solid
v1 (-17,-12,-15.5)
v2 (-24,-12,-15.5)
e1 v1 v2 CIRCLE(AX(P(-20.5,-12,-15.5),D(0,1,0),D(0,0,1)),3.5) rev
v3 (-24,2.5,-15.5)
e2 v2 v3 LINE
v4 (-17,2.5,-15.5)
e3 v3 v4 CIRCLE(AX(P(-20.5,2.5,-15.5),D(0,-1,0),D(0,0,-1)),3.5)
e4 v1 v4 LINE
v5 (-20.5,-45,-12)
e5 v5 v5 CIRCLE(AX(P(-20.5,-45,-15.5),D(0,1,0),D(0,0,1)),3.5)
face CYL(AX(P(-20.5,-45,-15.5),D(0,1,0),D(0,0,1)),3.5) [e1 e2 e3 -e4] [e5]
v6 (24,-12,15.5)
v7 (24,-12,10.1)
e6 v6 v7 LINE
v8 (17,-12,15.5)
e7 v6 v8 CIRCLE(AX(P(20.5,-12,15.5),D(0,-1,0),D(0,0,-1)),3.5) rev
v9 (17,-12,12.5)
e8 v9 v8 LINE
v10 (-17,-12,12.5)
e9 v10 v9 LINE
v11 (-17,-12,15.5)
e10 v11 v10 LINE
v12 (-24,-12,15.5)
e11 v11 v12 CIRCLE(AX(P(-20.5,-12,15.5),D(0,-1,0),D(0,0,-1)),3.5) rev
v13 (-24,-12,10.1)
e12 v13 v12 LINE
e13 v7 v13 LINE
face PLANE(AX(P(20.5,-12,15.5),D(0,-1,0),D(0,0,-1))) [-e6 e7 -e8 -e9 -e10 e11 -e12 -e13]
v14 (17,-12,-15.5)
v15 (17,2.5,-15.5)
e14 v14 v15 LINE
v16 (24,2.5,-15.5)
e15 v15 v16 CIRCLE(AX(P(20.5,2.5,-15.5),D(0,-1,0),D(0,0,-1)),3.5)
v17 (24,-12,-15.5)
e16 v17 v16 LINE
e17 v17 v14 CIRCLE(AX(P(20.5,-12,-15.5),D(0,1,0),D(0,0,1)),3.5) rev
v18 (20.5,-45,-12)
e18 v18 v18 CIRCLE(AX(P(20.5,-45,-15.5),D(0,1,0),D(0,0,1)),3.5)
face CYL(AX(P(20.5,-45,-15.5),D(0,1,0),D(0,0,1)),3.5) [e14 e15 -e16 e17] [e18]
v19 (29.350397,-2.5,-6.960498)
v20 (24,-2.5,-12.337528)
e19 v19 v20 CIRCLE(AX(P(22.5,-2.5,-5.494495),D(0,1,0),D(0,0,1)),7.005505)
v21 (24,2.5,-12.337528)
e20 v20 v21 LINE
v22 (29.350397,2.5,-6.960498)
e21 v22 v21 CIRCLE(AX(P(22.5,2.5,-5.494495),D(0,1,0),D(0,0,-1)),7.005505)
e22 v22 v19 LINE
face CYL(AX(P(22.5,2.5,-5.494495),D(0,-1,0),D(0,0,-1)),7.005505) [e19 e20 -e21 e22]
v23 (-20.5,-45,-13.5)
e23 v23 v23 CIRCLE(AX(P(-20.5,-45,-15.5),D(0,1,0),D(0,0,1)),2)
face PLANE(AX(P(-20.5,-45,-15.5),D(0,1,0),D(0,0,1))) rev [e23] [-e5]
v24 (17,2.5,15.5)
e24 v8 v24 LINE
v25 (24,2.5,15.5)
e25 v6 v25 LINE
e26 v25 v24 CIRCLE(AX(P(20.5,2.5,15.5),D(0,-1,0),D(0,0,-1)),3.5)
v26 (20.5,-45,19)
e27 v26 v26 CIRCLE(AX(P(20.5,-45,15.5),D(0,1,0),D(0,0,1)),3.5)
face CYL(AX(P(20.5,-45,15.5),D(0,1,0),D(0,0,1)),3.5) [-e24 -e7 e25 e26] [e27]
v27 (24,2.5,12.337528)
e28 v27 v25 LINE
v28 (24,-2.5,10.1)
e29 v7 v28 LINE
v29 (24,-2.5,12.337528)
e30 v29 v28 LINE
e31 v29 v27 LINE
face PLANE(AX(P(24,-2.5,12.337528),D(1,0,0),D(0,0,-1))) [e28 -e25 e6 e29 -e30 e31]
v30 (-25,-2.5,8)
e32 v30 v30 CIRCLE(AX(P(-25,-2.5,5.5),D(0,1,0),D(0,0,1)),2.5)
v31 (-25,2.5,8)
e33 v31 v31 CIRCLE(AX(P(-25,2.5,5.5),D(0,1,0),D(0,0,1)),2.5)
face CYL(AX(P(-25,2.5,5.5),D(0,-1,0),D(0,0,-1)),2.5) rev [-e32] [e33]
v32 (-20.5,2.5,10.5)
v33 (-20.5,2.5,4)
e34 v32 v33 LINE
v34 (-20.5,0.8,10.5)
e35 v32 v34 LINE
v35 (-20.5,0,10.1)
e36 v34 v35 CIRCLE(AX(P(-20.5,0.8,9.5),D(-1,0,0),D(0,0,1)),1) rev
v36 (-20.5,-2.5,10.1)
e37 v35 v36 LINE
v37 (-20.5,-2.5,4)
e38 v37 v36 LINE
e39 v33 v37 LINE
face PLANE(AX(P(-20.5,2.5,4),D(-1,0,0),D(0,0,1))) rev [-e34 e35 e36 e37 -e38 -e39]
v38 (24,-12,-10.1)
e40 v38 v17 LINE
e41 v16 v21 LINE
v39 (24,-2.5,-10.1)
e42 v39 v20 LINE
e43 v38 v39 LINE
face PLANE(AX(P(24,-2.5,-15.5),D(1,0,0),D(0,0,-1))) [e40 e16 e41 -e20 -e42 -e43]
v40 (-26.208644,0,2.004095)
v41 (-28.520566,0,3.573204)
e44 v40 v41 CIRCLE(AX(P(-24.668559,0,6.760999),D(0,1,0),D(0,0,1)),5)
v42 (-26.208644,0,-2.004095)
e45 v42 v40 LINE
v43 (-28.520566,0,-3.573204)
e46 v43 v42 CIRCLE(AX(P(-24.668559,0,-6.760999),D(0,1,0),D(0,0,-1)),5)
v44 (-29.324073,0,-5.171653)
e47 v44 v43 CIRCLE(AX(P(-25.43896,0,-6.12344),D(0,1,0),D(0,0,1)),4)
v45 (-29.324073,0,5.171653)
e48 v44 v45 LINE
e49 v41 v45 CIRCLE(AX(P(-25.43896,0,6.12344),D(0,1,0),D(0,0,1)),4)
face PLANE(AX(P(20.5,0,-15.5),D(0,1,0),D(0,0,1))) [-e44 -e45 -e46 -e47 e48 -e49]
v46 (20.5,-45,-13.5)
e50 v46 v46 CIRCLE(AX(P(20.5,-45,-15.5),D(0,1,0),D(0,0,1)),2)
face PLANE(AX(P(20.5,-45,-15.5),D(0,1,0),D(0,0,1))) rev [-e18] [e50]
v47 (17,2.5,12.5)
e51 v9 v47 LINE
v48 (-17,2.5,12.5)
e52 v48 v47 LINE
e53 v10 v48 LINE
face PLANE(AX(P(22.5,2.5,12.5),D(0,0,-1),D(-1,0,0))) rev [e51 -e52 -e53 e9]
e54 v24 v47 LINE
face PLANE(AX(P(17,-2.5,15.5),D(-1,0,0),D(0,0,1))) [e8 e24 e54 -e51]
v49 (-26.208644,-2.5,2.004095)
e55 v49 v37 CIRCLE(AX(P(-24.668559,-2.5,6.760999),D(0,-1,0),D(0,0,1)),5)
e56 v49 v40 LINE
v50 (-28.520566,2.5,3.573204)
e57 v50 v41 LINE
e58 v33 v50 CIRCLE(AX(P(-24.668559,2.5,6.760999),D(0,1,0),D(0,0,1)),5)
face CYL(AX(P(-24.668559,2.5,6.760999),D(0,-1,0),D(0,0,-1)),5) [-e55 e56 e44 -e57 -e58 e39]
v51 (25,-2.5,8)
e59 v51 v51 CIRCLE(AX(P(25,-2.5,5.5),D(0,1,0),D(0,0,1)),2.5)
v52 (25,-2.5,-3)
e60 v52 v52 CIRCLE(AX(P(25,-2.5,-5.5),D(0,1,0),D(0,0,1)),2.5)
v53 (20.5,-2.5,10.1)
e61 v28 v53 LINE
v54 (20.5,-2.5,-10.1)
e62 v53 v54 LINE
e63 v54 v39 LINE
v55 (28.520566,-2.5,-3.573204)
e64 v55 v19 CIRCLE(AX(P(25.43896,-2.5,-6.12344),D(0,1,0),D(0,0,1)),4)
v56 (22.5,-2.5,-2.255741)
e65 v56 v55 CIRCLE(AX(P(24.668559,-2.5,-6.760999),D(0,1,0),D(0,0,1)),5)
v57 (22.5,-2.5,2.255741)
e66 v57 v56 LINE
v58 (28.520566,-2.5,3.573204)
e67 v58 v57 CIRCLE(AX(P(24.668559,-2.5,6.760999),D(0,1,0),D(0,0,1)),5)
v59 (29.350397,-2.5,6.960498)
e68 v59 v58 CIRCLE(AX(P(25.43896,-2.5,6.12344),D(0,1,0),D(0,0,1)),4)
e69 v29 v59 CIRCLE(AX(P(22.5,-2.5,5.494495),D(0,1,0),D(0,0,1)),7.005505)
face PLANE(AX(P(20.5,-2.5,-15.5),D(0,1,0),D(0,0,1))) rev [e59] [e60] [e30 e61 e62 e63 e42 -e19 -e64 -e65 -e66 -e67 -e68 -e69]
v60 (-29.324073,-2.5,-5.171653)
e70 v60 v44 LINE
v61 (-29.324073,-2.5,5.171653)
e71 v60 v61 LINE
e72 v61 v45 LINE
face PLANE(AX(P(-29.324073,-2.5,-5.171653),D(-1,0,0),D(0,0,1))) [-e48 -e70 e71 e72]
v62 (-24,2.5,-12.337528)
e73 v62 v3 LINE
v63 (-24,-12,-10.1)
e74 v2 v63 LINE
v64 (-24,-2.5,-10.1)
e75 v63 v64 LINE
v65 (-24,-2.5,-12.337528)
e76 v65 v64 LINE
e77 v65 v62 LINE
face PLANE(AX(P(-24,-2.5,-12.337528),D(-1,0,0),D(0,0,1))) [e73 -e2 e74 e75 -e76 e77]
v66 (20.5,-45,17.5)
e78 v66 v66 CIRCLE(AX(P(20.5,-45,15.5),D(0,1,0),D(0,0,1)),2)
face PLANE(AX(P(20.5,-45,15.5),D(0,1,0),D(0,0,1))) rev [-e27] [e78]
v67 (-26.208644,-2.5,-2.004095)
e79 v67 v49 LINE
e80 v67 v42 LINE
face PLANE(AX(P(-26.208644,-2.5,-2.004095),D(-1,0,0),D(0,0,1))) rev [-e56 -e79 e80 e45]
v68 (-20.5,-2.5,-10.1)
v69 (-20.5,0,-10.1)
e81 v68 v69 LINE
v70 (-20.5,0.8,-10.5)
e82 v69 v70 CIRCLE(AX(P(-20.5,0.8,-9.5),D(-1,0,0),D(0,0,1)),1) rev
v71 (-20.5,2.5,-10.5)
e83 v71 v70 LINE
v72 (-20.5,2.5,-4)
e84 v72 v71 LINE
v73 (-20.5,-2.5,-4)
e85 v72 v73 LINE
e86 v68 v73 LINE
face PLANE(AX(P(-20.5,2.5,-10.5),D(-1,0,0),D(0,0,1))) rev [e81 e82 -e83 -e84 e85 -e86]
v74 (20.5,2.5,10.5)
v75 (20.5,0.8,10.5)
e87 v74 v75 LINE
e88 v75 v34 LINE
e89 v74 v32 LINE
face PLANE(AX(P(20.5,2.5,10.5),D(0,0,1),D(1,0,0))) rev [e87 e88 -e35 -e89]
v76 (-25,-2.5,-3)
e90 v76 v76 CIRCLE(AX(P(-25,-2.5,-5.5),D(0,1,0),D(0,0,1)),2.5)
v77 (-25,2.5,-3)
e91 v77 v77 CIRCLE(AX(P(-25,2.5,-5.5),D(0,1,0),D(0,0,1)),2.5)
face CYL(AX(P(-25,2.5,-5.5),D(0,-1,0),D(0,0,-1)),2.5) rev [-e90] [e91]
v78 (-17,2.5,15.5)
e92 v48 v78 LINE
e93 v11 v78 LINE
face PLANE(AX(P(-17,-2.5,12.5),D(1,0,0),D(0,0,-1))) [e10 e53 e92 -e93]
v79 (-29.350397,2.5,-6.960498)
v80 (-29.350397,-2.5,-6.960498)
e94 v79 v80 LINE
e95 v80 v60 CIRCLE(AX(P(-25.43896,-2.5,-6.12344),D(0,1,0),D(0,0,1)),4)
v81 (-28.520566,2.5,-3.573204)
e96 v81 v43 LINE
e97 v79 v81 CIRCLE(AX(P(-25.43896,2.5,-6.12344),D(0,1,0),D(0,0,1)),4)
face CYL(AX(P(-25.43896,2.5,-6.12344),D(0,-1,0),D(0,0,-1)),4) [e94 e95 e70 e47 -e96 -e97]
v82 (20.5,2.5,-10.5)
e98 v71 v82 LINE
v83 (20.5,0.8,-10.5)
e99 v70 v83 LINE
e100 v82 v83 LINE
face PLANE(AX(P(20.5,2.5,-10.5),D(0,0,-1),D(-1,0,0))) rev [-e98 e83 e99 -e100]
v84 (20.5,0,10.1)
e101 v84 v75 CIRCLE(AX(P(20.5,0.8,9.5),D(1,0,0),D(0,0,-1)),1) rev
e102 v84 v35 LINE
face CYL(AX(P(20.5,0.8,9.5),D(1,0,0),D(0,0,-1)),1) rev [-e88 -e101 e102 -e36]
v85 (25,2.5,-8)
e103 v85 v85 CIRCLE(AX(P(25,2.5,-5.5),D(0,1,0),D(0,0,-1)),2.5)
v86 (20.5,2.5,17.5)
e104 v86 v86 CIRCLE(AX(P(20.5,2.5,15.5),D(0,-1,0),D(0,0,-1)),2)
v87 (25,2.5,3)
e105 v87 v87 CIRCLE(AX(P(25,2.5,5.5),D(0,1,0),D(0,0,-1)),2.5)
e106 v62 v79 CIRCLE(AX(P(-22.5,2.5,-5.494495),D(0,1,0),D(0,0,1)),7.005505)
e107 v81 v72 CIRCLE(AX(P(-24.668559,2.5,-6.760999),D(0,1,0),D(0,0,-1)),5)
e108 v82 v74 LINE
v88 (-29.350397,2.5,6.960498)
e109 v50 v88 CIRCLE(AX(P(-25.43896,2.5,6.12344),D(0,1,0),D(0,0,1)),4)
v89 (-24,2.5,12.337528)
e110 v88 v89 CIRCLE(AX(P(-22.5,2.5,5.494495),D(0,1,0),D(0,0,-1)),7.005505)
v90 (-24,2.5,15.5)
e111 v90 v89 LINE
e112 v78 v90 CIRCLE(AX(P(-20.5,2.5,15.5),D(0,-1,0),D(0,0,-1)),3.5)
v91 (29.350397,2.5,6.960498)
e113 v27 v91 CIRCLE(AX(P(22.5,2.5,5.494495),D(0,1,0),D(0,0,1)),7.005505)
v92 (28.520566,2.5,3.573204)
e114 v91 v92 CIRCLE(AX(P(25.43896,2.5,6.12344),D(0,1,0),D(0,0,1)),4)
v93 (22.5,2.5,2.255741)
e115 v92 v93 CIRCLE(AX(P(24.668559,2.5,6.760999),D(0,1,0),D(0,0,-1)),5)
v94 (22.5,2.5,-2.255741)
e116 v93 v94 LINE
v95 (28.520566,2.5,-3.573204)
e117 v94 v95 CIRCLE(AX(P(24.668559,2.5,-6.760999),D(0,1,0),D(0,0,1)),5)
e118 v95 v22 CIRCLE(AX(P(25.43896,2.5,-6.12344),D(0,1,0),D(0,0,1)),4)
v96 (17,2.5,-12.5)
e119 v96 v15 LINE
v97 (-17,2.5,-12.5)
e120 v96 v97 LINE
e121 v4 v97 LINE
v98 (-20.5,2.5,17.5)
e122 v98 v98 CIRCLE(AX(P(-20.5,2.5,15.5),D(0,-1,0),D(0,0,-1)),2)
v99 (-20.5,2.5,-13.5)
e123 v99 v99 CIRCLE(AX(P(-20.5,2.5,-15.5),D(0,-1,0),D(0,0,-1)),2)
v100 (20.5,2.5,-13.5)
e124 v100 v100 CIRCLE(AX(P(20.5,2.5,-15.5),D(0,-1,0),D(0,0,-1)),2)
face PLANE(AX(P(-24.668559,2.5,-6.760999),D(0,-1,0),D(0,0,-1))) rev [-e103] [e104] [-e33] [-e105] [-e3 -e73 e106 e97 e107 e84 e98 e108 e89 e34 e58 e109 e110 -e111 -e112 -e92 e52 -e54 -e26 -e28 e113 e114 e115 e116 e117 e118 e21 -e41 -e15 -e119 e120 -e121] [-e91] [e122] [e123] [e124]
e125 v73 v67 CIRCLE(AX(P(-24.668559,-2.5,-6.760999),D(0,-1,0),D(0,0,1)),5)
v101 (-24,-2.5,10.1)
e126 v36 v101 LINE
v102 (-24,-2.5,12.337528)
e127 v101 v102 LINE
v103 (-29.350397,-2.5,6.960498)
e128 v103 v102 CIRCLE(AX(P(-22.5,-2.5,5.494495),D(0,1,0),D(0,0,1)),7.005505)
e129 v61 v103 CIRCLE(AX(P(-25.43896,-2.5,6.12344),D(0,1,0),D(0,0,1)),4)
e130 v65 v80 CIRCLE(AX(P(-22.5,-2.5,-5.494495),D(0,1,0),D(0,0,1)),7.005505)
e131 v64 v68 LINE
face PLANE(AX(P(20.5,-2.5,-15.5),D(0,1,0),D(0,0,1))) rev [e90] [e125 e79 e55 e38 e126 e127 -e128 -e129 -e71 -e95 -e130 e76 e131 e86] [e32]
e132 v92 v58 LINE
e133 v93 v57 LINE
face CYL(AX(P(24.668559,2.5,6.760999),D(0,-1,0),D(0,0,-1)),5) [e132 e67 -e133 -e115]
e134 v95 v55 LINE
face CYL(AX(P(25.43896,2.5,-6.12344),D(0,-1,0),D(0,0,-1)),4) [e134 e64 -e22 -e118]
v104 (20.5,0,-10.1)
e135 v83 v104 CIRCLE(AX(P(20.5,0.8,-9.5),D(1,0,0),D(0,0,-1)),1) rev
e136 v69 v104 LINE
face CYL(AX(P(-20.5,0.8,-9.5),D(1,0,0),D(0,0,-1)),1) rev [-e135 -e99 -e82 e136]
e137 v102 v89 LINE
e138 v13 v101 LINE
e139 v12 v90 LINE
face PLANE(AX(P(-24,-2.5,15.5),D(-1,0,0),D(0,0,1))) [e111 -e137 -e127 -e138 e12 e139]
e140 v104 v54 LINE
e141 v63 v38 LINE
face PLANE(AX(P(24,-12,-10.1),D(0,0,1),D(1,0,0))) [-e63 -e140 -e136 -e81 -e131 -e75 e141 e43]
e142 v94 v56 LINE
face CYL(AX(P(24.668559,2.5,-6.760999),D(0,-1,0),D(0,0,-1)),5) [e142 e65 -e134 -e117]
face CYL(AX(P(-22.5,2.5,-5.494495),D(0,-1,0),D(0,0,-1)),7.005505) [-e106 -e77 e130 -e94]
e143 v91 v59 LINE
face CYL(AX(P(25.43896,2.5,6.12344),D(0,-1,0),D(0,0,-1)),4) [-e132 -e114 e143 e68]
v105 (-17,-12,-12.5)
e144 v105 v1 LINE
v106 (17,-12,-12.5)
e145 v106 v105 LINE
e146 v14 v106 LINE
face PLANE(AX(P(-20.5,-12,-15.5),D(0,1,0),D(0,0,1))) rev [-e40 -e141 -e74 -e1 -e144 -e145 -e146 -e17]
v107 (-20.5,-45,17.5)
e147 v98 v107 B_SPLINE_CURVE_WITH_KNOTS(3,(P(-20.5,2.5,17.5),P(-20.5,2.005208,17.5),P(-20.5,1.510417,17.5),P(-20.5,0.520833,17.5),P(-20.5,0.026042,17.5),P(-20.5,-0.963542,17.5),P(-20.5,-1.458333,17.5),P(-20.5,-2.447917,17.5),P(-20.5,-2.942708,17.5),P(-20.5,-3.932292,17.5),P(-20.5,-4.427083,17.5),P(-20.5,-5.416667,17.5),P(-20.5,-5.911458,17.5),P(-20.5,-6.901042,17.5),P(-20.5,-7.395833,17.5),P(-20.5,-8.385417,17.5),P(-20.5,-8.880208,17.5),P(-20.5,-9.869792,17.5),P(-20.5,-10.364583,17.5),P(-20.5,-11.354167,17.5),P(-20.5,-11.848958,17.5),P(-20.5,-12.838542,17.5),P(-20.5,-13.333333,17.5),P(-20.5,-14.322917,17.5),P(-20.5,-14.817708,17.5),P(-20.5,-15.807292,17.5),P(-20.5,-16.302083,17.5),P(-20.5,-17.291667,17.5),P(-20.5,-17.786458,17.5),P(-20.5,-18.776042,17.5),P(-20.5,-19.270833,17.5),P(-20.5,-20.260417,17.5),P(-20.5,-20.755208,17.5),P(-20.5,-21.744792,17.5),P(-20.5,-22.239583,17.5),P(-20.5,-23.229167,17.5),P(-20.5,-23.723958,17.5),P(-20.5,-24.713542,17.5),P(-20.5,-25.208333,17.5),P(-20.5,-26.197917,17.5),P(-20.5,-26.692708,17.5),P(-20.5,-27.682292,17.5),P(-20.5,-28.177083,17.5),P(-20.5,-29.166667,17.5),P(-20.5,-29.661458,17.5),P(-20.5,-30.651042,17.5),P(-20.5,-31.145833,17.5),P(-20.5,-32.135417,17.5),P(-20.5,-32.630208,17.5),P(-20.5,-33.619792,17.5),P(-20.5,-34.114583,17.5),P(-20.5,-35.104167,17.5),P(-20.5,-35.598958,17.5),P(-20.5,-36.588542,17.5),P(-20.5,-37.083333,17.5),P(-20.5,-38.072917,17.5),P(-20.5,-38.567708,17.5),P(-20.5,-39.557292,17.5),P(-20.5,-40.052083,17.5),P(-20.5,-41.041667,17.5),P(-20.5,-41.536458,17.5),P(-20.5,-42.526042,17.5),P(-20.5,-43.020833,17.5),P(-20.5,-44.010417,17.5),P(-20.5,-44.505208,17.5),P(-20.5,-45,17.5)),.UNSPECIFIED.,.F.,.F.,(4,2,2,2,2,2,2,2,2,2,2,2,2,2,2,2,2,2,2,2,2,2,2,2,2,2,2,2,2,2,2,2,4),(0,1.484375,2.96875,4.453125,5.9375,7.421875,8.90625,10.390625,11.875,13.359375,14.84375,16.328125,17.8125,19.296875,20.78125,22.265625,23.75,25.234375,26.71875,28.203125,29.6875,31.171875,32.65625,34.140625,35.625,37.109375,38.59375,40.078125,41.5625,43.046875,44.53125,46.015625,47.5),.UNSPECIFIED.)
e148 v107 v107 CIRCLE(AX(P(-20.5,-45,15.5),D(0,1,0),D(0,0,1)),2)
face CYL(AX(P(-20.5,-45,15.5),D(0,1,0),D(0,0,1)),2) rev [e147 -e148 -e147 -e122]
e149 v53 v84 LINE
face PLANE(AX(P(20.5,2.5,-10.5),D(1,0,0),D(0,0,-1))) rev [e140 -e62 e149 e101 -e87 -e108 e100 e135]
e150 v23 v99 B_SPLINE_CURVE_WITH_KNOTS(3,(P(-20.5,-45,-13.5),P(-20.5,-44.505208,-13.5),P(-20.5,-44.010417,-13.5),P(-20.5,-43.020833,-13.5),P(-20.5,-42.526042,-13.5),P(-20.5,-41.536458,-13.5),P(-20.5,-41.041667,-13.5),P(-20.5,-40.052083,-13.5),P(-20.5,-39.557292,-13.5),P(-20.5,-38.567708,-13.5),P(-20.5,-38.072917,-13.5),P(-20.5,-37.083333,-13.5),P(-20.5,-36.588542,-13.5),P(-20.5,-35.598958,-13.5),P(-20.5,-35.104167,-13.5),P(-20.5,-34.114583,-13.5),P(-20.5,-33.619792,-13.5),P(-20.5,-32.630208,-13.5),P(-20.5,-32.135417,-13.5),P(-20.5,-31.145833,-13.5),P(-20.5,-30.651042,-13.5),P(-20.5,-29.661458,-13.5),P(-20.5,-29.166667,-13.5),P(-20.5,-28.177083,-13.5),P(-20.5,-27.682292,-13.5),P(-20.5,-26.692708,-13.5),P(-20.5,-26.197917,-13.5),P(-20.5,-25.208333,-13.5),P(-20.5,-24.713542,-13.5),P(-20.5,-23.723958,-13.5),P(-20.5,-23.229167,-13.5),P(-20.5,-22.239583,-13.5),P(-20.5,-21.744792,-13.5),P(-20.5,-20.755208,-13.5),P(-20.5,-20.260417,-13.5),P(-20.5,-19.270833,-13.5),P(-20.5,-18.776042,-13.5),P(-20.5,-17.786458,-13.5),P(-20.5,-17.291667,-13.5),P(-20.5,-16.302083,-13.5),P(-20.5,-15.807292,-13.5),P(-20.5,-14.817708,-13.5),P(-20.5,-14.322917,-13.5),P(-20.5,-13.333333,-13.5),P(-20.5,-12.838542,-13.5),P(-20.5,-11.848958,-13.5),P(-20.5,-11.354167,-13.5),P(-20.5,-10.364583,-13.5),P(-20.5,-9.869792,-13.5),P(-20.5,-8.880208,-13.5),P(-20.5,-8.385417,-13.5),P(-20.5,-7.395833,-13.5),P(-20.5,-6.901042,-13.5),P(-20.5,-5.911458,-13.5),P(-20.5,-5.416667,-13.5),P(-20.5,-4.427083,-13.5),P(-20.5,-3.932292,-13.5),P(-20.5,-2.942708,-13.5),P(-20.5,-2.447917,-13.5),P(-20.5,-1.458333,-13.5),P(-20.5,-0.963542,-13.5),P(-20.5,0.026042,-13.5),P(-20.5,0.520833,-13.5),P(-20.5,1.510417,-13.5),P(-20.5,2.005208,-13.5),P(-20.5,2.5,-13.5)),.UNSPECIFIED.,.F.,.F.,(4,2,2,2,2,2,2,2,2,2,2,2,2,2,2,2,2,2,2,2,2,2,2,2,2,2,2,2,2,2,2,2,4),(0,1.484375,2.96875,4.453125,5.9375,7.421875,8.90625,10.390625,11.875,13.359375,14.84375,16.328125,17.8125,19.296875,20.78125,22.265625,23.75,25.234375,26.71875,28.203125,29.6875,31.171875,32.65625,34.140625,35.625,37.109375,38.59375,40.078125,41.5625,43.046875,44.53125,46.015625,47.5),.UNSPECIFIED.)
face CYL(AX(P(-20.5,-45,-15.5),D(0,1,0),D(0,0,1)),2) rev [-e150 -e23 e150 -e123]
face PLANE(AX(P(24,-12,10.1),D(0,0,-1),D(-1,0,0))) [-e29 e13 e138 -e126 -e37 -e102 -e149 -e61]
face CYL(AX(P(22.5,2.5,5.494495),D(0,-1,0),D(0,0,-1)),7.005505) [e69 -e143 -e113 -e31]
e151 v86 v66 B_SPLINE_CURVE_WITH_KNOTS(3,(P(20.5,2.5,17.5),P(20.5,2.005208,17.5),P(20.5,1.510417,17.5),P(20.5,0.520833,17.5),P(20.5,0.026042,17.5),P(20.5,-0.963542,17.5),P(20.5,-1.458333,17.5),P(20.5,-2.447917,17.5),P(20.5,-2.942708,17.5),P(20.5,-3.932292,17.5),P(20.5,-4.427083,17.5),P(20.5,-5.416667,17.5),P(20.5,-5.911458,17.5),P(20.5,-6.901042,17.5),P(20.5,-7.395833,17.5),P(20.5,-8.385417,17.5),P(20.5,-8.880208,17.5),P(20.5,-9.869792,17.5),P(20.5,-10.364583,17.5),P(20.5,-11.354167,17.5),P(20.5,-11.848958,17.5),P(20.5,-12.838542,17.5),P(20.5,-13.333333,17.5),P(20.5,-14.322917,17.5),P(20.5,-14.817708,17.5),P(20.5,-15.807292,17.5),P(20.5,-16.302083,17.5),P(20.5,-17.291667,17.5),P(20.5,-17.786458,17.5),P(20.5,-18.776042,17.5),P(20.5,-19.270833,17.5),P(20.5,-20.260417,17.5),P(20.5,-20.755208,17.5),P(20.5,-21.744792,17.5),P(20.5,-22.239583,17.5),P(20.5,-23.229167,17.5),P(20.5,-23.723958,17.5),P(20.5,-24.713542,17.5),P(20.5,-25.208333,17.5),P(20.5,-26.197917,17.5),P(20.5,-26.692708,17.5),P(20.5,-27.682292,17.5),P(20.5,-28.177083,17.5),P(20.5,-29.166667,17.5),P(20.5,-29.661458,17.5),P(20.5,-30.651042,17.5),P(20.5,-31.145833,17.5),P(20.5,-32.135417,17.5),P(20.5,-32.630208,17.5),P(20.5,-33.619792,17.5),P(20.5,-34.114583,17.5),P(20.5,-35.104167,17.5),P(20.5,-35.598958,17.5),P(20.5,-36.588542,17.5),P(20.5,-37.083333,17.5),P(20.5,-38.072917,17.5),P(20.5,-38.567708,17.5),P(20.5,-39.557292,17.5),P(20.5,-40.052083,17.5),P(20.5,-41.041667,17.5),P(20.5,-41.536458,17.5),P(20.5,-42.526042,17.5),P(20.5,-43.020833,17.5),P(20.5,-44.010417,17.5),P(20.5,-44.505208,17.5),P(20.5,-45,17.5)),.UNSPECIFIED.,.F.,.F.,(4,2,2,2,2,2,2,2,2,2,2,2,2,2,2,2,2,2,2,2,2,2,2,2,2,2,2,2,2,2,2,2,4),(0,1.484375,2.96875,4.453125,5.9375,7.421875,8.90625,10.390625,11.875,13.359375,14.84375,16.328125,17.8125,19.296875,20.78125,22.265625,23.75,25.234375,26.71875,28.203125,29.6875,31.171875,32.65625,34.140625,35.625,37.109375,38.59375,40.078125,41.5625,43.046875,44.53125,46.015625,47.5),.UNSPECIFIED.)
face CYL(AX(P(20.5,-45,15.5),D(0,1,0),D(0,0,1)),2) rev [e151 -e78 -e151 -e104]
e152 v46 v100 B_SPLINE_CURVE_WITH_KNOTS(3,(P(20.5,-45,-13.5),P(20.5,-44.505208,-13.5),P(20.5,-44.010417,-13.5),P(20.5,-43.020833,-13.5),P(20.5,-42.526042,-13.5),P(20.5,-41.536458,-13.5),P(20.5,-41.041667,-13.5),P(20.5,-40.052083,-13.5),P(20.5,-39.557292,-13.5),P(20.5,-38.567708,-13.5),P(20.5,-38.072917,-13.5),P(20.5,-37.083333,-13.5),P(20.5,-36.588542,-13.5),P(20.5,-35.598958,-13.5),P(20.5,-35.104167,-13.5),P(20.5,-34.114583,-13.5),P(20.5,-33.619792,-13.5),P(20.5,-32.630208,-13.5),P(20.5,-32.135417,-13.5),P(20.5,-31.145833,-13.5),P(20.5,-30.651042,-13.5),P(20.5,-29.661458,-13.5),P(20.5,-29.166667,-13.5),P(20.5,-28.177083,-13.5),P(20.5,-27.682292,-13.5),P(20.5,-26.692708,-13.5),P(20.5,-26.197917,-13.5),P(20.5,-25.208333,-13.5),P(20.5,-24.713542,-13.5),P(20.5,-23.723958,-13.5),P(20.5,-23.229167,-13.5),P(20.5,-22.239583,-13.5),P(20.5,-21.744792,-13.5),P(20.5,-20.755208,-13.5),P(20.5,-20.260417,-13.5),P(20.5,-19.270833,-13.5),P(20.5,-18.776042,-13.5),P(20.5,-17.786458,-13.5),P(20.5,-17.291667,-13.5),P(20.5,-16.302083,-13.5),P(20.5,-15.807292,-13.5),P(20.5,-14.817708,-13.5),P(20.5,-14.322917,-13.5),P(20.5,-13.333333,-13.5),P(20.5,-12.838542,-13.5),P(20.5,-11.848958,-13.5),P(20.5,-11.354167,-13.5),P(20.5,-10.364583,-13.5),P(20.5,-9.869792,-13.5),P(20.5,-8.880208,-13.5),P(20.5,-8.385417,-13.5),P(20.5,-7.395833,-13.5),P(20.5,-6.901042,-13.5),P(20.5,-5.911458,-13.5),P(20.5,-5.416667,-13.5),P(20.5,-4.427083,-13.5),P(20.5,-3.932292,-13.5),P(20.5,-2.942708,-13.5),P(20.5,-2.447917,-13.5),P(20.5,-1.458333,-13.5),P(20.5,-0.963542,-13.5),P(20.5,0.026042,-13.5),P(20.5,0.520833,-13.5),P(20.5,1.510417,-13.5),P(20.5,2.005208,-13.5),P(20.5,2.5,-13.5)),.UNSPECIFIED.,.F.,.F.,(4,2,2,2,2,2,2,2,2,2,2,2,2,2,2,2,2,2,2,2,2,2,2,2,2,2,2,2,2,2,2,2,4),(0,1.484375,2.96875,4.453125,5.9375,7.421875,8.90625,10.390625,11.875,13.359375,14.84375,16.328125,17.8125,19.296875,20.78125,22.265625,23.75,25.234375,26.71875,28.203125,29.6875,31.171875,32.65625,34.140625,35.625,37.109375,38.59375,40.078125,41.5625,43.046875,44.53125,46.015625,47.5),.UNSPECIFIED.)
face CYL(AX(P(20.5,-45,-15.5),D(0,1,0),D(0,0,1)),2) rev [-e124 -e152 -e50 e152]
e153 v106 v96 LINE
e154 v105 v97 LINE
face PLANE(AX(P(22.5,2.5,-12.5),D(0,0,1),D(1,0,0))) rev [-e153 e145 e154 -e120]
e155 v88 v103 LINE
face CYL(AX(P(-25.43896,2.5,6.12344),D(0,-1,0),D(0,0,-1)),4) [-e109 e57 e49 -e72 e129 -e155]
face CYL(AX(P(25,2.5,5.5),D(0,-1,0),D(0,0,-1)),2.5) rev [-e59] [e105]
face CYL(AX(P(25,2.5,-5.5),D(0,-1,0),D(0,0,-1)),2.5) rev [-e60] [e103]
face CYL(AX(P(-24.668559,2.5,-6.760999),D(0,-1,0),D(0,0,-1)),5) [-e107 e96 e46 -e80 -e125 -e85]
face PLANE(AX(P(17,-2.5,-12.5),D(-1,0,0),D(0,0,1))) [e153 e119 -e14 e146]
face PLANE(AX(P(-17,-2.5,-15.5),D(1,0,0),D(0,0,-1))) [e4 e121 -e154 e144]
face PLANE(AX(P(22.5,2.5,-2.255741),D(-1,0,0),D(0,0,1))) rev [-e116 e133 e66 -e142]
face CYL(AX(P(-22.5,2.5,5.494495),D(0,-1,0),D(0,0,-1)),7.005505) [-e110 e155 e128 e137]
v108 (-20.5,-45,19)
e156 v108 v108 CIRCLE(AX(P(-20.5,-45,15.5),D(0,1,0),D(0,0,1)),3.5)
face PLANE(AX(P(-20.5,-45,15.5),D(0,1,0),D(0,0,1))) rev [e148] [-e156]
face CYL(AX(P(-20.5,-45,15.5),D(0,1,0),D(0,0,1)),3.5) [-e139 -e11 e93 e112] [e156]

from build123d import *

# Parameters (mm, degrees)
SKETCH1_R           = 2.5
BOSS_EXTRUDE1_DEPTH = 2.5
BOSS_EXTRUDE2_START = -45
SKETCH4_R           = 3.5
SKETCH4_R_2         = 2
BOSS_EXTRUDE2_DEPTH = 47.5
BOSS_EXTRUDE3_START = -2.5
SKETCH5_R           = 2.5
BOSS_EXTRUDE3_DEPTH = 2.5
BOSS_EXTRUDE4_START = -12
BOSS_EXTRUDE4_DEPTH = 12
BOSS_EXTRUDE5_DEPTH = 2.5
FILLET2_R           = 1
FILLET3_R           = 1


with BuildPart() as part:
    # Sketch1 → Boss-Extrude1 (new body)
    with BuildSketch(Plane(origin=(0, 0, 0), x_dir=(1, 0, 0), z_dir=(0, 1, 0))):
        with BuildLine():
            Line((20.5, 10.5), (-20.5, 10.5))
            Line((-20.5, 10.5), (-20.5, 4))
            ThreePointArc((-20.5, 4), (-24.40287122, 1.76806345), (-28.520566145, 3.573204173))
            ThreePointArc((-28.520566145, 3.573204173), (-29.324072849, 5.171652721), (-29.350396575, 6.960498116))
            ThreePointArc((-29.350396575, 6.960498116), (-26.904940816, 10.941842627), (-22.5, 12.5))
            Line((-22.5, 12.5), (22.5, 12.5))
            ThreePointArc((22.5, 12.5), (26.904940816, 10.941842627), (29.350396575, 6.960498116))
            ThreePointArc((29.350396575, 6.960498116), (29.324072849, 5.171652721), (28.520566145, 3.573204173))
            ThreePointArc((28.520566145, 3.573204173), (25.737402548, 1.876578025), (22.5, 2.2557411))
            Line((22.5, 2.2557411), (22.5, -2.2557411))
            ThreePointArc((22.5, -2.2557411), (25.737402548, -1.876578025), (28.520566145, -3.573204173))
            ThreePointArc((28.520566145, -3.573204173), (29.324072849, -5.171652721), (29.350396575, -6.960498116))
            ThreePointArc((29.350396575, -6.960498116), (26.904940816, -10.941842627), (22.5, -12.5))
            Line((22.5, -12.5), (-22.5, -12.5))
            ThreePointArc((-22.5, -12.5), (-26.904940816, -10.941842627), (-29.350396575, -6.960498116))
            ThreePointArc((-29.350396575, -6.960498116), (-29.324072849, -5.171652721), (-28.520566145, -3.573204173))
            ThreePointArc((-28.520566145, -3.573204173), (-24.40287122, -1.76806345), (-20.5, -4))
            Line((-20.5, -4), (-20.5, -10.5))
            Line((-20.5, -10.5), (20.5, -10.5))
            Line((20.5, -10.5), (20.5, 10.5))
        make_face()
        with Locations(Location((-25, 5.5, 0), (0, 0, 270))):
            Circle(SKETCH1_R, mode=Mode.SUBTRACT)
        with Locations(Location((-25, -5.5, 0), (0, 0, 270))):
            Circle(SKETCH1_R, mode=Mode.SUBTRACT)
        with Locations(Location((25, -5.5, 0), (0, 0, 90))):
            Circle(SKETCH1_R, mode=Mode.SUBTRACT)
        with Locations(Location((25, 5.5, 0), (0, 0, 90))):
            Circle(SKETCH1_R, mode=Mode.SUBTRACT)
    extrude(amount=BOSS_EXTRUDE1_DEPTH)

    # Sketch4 → Boss-Extrude2 (add)
    # profile 1 of 4: a face of its own
    with BuildSketch(Plane(origin=(0, 0, 0), x_dir=(1, 0, 0), z_dir=(0, 1, 0)).offset(BOSS_EXTRUDE2_START)):
        with Locations(Location((-20.5, 15.5, 0), (0, 0, 270))):
            Circle(SKETCH4_R)
        with Locations(Location((-20.5, 15.5, 0), (0, 0, 270))):
            Circle(SKETCH4_R_2, mode=Mode.SUBTRACT)
    # profile 2 of 4: a face of its own
    with BuildSketch(Plane(origin=(0, 0, 0), x_dir=(1, 0, 0), z_dir=(0, 1, 0)).offset(BOSS_EXTRUDE2_START)):
        with Locations(Location((20.5, 15.5, 0), (0, 0, 270))):
            Circle(SKETCH4_R)
        with Locations(Location((20.5, 15.5, 0), (0, 0, 270))):
            Circle(SKETCH4_R_2, mode=Mode.SUBTRACT)
    # profile 3 of 4: a face of its own
    with BuildSketch(Plane(origin=(0, 0, 0), x_dir=(1, 0, 0), z_dir=(0, 1, 0)).offset(BOSS_EXTRUDE2_START)):
        with Locations(Location((-20.5, -15.5, 0), (0, 0, 270))):
            Circle(SKETCH4_R)
        with Locations(Location((-20.5, -15.5, 0), (0, 0, 270))):
            Circle(SKETCH4_R_2, mode=Mode.SUBTRACT)
    # profile 4 of 4: a face of its own
    with BuildSketch(Plane(origin=(0, 0, 0), x_dir=(1, 0, 0), z_dir=(0, 1, 0)).offset(BOSS_EXTRUDE2_START)):
        with Locations(Location((20.5, -15.5, 0), (0, 0, 270))):
            Circle(SKETCH4_R)
        with Locations(Location((20.5, -15.5, 0), (0, 0, 270))):
            Circle(SKETCH4_R_2, mode=Mode.SUBTRACT)
    extrude(amount=BOSS_EXTRUDE2_DEPTH)

    # Sketch5 → Boss-Extrude3 (add)
    with BuildSketch(Plane(origin=(0, 0, 0), x_dir=(1, 0, 0), z_dir=(0, 1, 0)).offset(BOSS_EXTRUDE3_START)):
        with BuildLine():
            Line((-29.324072849, 5.171652721), (-29.324072849, -5.171652721))
            ThreePointArc((-29.324072849, -5.171652721), (-29.438527194, -6.064584851), (-29.350396575, -6.960498116))
            ThreePointArc((-29.350396575, -6.960498116), (-27.465923203, -10.435821373), (-24, -12.337527971))
            Line((-24, -12.337527971), (-24, -15.5))
            Line((-24, -15.5), (-22.5, -15.5))
            ThreePointArc((-22.5, -15.5), (-20.5, -13.5), (-18.5, -15.5))
            Line((-18.5, -15.5), (-17, -15.5))
            Line((-17, -15.5), (-17, -12.5))
            Line((-17, -12.5), (17, -12.5))
            Line((17, -12.5), (17, -15.5))
            Line((17, -15.5), (18.5, -15.5))
            ThreePointArc((18.5, -15.5), (20.5, -13.5), (22.5, -15.5))
            Line((22.5, -15.5), (24, -15.5))
            Line((24, -15.5), (24, -12.337527971))
            ThreePointArc((24, -12.337527971), (27.465923203, -10.435821373), (29.350396575, -6.960498116))
            ThreePointArc((29.350396575, -6.960498116), (29.324072849, -5.171652721), (28.520566145, -3.573204173))
            ThreePointArc((28.520566145, -3.573204173), (25.737402548, -1.876578025), (22.5, -2.2557411))
            Line((22.5, -2.2557411), (22.5, 2.2557411))
            ThreePointArc((22.5, 2.2557411), (25.737402548, 1.876578025), (28.520566145, 3.573204173))
            ThreePointArc((28.520566145, 3.573204173), (29.324072849, 5.171652721), (29.350396575, 6.960498116))
            ThreePointArc((29.350396575, 6.960498116), (27.465923203, 10.435821373), (24, 12.337527971))
            Line((24, 12.337527971), (24, 15.5))
            Line((24, 15.5), (22.5, 15.5))
            ThreePointArc((22.5, 15.5), (20.5, 13.5), (18.5, 15.5))
            Line((18.5, 15.5), (17, 15.5))
            Line((17, 15.5), (17, 12.5))
            Line((17, 12.5), (-17, 12.5))
            Line((-17, 12.5), (-17, 15.5))
            Line((-17, 15.5), (-18.5, 15.5))
            ThreePointArc((-18.5, 15.5), (-20.5, 13.5), (-22.5, 15.5))
            Line((-22.5, 15.5), (-24, 15.5))
            Line((-24, 15.5), (-24, 12.337527971))
            ThreePointArc((-24, 12.337527971), (-27.465923203, 10.435821373), (-29.350396575, 6.960498116))
            ThreePointArc((-29.350396575, 6.960498116), (-29.438527194, 6.064584851), (-29.324072849, 5.171652721))
        make_face()
        with Locations(Location((-25, 5.5, 0), (0, 0, 270))):
            Circle(SKETCH5_R, mode=Mode.SUBTRACT)
        with Locations(Location((-25, -5.5, 0), (0, 0, 270))):
            Circle(SKETCH5_R, mode=Mode.SUBTRACT)
        with Locations(Location((25, -5.5, 0), (0, 0, 90))):
            Circle(SKETCH5_R, mode=Mode.SUBTRACT)
        with Locations(Location((25, 5.5, 0), (0, 0, 90))):
            Circle(SKETCH5_R, mode=Mode.SUBTRACT)
        with BuildLine():
            Line((-26.208643878, 2.004095257), (-26.208643878, -2.004095257))
            ThreePointArc((-26.208643878, -2.004095257), (-23.018368657, -2.041161266), (-20.5, -4))
            Line((-20.5, -4), (-20.5, -10.5))
            Line((-20.5, -10.5), (20.5, -10.5))
            Line((20.5, -10.5), (20.5, 10.5))
            Line((20.5, 10.5), (-20.5, 10.5))
            Line((-20.5, 10.5), (-20.5, 4))
            ThreePointArc((-20.5, 4), (-23.018368657, 2.041161266), (-26.208643878, 2.004095257))
        make_face(mode=Mode.SUBTRACT)
    extrude(amount=BOSS_EXTRUDE3_DEPTH)

    # Sketch6 → Boss-Extrude4 (add)
    with BuildSketch(Plane(origin=(0, 0, 0), x_dir=(1, 0, 0), z_dir=(0, 1, 0)).offset(BOSS_EXTRUDE4_START)):
        with BuildLine():
            Line((-24, 15.5), (-22.5, 15.5))
            ThreePointArc((-22.5, 15.5), (-20.5, 13.5), (-18.5, 15.5))
            Line((-18.5, 15.5), (-17, 15.5))
            Line((-17, 15.5), (-17, 12.5))
            Line((-17, 12.5), (17, 12.5))
            Line((17, 12.5), (17, 15.5))
            Line((17, 15.5), (18.5, 15.5))
            ThreePointArc((18.5, 15.5), (20.5, 13.5), (22.5, 15.5))
            Line((22.5, 15.5), (24, 15.5))
            Line((24, 15.5), (24, 10.1))
            Line((24, 10.1), (-24, 10.1))
            Line((-24, 10.1), (-24, 15.5))
        make_face()
        with BuildLine():
            Line((24, -15.5), (24, -10.1))
            Line((24, -10.1), (-24, -10.1))
            Line((-24, -10.1), (-24, -15.5))
            Line((-24, -15.5), (-22.5, -15.5))
            ThreePointArc((-22.5, -15.5), (-20.5, -13.5), (-18.5, -15.5))
            Line((-18.5, -15.5), (-17, -15.5))
            Line((-17, -15.5), (-17, -12.5))
            Line((-17, -12.5), (17, -12.5))
            Line((17, -12.5), (17, -15.5))
            Line((17, -15.5), (18.5, -15.5))
            ThreePointArc((18.5, -15.5), (20.5, -13.5), (22.5, -15.5))
            Line((22.5, -15.5), (24, -15.5))
        make_face()
    extrude(amount=BOSS_EXTRUDE4_DEPTH)

    # Sketch7 → Boss-Extrude5 (add)
    with BuildSketch(Plane(origin=(0, 0, 0), x_dir=(1, 0, 0), z_dir=(0, 1, 0))):
        with BuildLine():
            Line((-24, -15.5), (-24, -10.98088563))
            Line((-24, -10.98088563), (-17, -10.98088563))
            Line((-17, -10.98088563), (-17, -15.5))
            ThreePointArc((-17, -15.5), (-20.5, -12), (-24, -15.5))
        make_face()
        with BuildLine():
            Line((17, -15.5), (17, -10.98088563))
            Line((17, -10.98088563), (24, -10.98088563))
            Line((24, -10.98088563), (24, -15.5))
            ThreePointArc((24, -15.5), (20.5, -12), (17, -15.5))
        make_face()
        with BuildLine():
            Line((24, 10.98088563), (24, 15.5))
            ThreePointArc((24, 15.5), (20.5, 12), (17, 15.5))
            Line((17, 15.5), (17, 10.98088563))
            Line((17, 10.98088563), (24, 10.98088563))
        make_face()
        with BuildLine():
            Line((-24, 10.98088563), (-17, 10.98088563))
            Line((-17, 10.98088563), (-17, 15.5))
            ThreePointArc((-17, 15.5), (-20.5, 12), (-24, 15.5))
            Line((-24, 15.5), (-24, 10.98088563))
        make_face()
    extrude(amount=BOSS_EXTRUDE5_DEPTH)

    # Fillet2
    # the kernel refuses this fillet: 1 mm, written as the material it adds along each edge
    with BuildSketch(Plane(origin=(-22.5, 0, -10.5), x_dir=(0, 1, 0), z_dir=(1, 0, 0))) as fillet2_piece_1:
        with BuildLine():
            CenterArc((0.8, 1), FILLET2_R, 216.869897646, 53.130102354)
            Line((0, 0.4), (-0.016, 0.388))
            ThreePointArc((-0.016, 0.388), (-0.02, 0.2), (-0.02, 0))
            Line((-0.02, 0), (0, -0.02))
            Line((0, -0.02), (0.8, -0.02))
            Line((0.8, -0.02), (0.8, 0))
        make_face()
    extrude(amount=45)

    # Fillet3
    # the kernel refuses this fillet: 1 mm, written as the material it adds along each edge
    with BuildSketch(Plane(origin=(-22.5, 0, 10.5), x_dir=(0, 0, -1), z_dir=(1, 0, 0))) as fillet3_piece_1:
        with BuildLine():
            CenterArc((1, 0.8), FILLET3_R, 180, 53.130102354)
            Line((0, 0.8), (-0.02, 0.8))
            Line((-0.02, 0.8), (-0.02, 0))
            Line((-0.02, 0), (0, -0.02))
            ThreePointArc((0, -0.02), (0.2, -0.02), (0.388, -0.016))
            Line((0.388, -0.016), (0.4, 0))
        make_face()
    extrude(amount=45)


solid = part.part
